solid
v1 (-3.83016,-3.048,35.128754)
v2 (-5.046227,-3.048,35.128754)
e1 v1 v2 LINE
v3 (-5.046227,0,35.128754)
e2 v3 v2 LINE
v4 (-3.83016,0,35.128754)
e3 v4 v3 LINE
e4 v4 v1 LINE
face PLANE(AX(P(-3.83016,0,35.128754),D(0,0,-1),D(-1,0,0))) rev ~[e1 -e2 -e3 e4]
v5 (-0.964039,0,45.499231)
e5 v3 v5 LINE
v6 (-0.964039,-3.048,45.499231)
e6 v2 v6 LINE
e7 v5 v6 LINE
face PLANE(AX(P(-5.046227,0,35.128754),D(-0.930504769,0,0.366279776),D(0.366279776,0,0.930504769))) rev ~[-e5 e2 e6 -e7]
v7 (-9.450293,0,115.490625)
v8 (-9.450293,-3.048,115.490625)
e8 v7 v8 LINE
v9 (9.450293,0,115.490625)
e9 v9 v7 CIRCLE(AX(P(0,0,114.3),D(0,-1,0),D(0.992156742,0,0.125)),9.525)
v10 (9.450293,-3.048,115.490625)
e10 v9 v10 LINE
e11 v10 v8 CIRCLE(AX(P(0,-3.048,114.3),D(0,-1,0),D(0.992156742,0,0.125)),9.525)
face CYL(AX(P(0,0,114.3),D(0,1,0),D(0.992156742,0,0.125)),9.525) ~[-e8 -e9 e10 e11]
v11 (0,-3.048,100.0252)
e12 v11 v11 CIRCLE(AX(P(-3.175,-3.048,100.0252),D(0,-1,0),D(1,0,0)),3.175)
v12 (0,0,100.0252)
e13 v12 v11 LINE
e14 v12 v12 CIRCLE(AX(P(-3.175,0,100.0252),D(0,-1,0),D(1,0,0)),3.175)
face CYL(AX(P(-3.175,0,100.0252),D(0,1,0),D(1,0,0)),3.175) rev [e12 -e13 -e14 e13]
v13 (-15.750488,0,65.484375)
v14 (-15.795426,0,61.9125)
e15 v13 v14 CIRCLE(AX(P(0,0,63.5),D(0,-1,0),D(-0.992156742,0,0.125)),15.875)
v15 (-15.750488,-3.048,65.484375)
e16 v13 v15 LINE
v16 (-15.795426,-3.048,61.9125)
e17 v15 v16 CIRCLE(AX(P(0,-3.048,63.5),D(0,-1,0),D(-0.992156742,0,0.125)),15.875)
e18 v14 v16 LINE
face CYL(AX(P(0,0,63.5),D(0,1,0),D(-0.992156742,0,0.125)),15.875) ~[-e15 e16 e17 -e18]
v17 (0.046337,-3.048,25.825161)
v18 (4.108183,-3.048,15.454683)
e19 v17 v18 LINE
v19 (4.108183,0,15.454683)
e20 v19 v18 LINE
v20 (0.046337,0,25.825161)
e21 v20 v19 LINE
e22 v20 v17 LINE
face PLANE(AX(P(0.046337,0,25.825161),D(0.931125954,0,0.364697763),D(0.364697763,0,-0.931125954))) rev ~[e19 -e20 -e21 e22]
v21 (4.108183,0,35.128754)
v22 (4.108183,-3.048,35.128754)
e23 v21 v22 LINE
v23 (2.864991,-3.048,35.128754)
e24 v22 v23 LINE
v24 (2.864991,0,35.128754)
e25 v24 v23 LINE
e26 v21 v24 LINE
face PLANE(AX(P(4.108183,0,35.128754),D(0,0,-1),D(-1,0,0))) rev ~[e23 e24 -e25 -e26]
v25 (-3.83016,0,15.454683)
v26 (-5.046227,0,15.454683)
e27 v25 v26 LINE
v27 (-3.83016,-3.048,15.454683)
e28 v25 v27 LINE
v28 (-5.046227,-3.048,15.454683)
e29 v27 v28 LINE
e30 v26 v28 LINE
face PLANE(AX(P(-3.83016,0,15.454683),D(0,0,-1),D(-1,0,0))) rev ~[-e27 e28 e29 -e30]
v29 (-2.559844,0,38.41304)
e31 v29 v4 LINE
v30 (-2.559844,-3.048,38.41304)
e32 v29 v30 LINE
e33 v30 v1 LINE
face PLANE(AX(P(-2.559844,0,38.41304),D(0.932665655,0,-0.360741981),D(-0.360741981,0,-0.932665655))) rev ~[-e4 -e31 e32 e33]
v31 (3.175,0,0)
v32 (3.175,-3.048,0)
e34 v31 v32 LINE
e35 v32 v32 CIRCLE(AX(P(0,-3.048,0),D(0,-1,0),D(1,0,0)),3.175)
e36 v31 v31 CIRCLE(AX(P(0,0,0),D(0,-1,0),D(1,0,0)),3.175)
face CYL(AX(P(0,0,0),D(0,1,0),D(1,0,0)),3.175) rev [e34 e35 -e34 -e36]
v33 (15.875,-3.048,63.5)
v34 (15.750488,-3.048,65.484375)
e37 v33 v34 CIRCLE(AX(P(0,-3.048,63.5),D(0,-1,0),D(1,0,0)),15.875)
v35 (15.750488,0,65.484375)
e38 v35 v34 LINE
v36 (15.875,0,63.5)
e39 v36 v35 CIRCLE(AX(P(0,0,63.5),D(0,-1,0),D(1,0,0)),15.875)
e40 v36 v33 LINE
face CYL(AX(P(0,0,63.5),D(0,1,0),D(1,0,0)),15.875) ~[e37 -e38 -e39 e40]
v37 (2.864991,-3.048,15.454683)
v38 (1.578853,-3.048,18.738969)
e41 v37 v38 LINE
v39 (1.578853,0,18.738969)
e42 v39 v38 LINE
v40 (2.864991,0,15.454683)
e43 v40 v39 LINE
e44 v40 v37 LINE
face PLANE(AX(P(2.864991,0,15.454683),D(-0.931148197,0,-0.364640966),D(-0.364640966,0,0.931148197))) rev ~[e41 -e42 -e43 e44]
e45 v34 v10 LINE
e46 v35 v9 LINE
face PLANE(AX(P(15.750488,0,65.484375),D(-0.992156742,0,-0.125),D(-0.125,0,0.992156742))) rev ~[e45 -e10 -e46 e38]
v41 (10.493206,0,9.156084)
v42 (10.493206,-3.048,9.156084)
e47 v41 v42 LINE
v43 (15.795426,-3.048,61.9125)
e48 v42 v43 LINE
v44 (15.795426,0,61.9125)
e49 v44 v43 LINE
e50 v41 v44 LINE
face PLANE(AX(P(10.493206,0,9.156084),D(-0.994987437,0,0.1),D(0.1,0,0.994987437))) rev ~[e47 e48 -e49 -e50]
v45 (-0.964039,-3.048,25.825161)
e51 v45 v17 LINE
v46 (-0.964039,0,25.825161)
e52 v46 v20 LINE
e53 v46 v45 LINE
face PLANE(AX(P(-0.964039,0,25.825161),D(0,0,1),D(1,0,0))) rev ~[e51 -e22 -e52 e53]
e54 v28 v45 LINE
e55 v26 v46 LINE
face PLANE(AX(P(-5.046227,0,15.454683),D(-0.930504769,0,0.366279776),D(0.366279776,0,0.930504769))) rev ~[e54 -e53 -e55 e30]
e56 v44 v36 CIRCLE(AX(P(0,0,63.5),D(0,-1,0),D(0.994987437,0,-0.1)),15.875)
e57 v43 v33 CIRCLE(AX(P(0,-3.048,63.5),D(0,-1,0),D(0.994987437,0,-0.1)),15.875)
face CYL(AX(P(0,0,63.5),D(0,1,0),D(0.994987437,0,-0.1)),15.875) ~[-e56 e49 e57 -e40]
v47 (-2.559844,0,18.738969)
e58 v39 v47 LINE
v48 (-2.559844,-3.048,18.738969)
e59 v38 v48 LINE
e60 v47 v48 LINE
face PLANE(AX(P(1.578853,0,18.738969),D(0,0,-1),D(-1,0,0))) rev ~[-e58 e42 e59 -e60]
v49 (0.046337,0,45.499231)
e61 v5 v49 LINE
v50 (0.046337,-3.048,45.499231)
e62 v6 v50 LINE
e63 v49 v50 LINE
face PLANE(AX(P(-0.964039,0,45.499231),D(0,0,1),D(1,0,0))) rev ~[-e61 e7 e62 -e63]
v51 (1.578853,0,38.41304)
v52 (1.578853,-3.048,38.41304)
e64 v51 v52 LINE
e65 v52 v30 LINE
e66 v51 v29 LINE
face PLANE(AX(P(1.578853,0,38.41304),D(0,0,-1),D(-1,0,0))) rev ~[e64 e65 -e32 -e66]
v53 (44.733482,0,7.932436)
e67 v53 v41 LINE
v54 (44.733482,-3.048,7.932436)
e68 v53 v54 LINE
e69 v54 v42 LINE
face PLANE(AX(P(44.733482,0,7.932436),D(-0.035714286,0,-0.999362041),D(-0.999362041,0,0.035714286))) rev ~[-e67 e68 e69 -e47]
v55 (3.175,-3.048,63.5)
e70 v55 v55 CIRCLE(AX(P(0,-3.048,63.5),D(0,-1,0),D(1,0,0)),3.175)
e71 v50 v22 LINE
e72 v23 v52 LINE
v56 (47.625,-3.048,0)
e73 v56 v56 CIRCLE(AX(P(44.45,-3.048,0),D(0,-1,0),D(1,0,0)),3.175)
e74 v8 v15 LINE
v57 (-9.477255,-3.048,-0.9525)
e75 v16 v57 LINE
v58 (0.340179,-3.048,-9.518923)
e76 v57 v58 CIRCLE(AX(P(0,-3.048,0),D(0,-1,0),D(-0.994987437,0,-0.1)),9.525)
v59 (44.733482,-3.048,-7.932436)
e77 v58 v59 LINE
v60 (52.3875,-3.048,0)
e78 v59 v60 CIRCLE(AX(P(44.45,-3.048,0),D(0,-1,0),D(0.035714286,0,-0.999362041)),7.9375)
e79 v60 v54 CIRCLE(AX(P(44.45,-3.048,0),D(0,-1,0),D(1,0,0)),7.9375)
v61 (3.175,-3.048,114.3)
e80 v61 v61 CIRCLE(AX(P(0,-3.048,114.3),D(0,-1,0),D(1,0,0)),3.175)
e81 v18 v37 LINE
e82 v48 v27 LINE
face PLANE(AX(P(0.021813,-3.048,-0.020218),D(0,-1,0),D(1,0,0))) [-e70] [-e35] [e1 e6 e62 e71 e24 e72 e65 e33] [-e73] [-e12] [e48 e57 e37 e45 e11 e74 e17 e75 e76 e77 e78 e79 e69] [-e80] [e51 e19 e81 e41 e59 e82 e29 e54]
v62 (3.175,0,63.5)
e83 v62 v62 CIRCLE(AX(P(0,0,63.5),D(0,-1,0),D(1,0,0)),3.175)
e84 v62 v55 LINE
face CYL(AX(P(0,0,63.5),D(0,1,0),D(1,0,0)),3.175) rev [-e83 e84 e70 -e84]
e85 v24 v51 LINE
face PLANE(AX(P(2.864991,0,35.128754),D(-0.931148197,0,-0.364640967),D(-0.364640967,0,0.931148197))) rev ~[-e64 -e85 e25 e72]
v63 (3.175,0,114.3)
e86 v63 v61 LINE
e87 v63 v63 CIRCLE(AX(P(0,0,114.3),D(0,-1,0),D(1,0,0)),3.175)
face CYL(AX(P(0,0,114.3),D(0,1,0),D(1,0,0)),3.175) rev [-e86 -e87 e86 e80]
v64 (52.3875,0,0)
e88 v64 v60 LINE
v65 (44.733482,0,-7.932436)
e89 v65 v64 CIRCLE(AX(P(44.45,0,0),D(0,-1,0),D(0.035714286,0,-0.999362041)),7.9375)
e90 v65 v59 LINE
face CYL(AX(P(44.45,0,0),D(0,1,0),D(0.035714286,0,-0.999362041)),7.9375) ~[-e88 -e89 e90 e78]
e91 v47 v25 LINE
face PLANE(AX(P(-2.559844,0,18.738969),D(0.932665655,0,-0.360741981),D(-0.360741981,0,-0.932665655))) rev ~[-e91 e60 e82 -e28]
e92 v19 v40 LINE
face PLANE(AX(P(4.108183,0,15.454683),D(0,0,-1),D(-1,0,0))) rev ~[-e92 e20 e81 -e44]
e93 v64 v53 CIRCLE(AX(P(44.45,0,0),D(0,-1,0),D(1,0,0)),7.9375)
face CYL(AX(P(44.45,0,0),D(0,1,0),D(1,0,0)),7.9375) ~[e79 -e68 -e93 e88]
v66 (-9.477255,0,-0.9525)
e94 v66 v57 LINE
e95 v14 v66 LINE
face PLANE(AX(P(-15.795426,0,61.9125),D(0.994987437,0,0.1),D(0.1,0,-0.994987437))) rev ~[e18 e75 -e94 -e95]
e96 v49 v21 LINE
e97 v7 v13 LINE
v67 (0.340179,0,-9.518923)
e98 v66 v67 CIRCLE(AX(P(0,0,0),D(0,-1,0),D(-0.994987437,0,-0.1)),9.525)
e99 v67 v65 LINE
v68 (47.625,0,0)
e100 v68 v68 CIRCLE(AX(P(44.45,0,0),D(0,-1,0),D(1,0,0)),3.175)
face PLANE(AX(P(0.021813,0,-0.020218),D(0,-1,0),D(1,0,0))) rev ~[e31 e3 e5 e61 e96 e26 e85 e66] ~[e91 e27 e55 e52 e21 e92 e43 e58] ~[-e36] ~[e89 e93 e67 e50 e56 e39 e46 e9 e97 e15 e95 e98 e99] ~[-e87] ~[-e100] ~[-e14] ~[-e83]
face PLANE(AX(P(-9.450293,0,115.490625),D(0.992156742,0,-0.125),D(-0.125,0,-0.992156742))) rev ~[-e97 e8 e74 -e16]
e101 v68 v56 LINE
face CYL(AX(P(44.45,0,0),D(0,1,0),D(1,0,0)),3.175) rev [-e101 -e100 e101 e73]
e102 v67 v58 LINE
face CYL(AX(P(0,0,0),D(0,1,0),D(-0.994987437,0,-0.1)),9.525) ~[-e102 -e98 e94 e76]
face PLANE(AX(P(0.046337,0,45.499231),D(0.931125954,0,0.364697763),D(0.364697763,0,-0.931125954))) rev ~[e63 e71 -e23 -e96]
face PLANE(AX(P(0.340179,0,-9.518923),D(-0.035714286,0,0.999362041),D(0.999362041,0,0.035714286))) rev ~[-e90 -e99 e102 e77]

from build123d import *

# Parameters (mm, degrees)
F0_R     = 3.175
F1_DEPTH = 3.048


with BuildPart() as f1:
    # F0 (on Front) → F1 (new body)
    with BuildSketch(Plane.XZ):
        with BuildLine():
            ThreePointArc((9.4772553384, -0.9525), (9.5130563464, -0.4768479324), (9.525, 0))
            ThreePointArc((9.525, 0), (6.8544082857, 6.6138273378), (0.3401785714, 9.5189234444))
            ThreePointArc((0.3401785714, 9.5189234444), (-6.948684782, 6.5147068085), (-9.4772553384, -0.9525))
            ThreePointArc((-9.4772553384, -0.9525), (-6.2623833552, -7.1769199322), (0.3401786416, -9.5189234418))
            ThreePointArc((0.3401786416, -9.5189234418), (6.5147068341, -6.948684758), (9.4772553384, -0.9525))
        make_face()
        Circle(F0_R, mode=Mode.SUBTRACT)
        with BuildLine():
            ThreePointArc((0.3401785714, 9.5189234444), (6.8544082857, 6.6138273378), (9.525, 0))
            ThreePointArc((9.525, 0), (9.5130563464, -0.4768479324), (9.4772553384, -0.9525))
            Line((9.4772553384, -0.9525), (10.4932062399, 9.1560838367))
            Line((10.4932062399, 9.1560838367), (0.3401785714, 9.5189234444))
        make_face()
        with BuildLine():
            ThreePointArc((-9.4772553384, -0.9525), (-6.948684782, 6.5147068085), (0.3401785714, 9.5189234444))
            Line((0.3401785714, 9.5189234444), (10.4932062399, 9.1560838367))
            Line((10.4932062399, 9.1560838367), (15.7954255641, 61.9125))
            ThreePointArc((15.7954255641, 61.9125), (0, 47.625), (-15.7954255641, 61.9125))
            Line((-15.7954255641, 61.9125), (-9.4772553384, -0.9525))
        make_face()
        Polygon((4.1081828244, 15.4546830389), (2.8649913232, 15.4546830389), (1.5788532065, 18.7389689503), (-2.5598443184, 18.7389689503), (-3.8301599978, 15.4546830389), (-5.0462273207, 15.4546830389), (-0.9640385005, 25.825160507), (0.0463371378, 25.825160507), align=None, mode=Mode.SUBTRACT)
        Polygon((4.1081828244, 35.1287536323), (2.8649913232, 35.1287536323), (1.5788532065, 38.4130395436), (-2.5598443184, 38.4130395436), (-3.8301599978, 35.1287536323), (-5.0462273207, 35.1287536323), (-0.9640385005, 45.4992311004), (0.0463371378, 45.4992311004), align=None, mode=Mode.SUBTRACT)
        with BuildLine():
            Line((10.4932062399, 9.1560838367), (9.4772553384, -0.9525))
            ThreePointArc((9.4772553384, -0.9525), (6.5147068341, -6.948684758), (0.3401786416, -9.5189234418))
            Line((0.3401786416, -9.5189234418), (44.7334821429, -7.9324362036))
            ThreePointArc((44.7334821429, -7.9324362036), (36.5125, 0), (44.7334821429, 7.9324362036))
            Line((44.7334821429, 7.9324362036), (10.4932062399, 9.1560838367))
        make_face()
        with BuildLine():
            ThreePointArc((-15.7504882737, 65.484375), (-15.8737438155, 63.6997054867), (-15.7954255641, 61.9125))
            ThreePointArc((-15.7954255641, 61.9125), (0, 47.625), (15.7954255641, 61.9125))
            ThreePointArc((15.7954255641, 61.9125), (15.8550939106, 62.7052534459), (15.875, 63.5))
            ThreePointArc((15.875, 63.5), (15.8438414904, 64.4941387366), (15.7504882737, 65.484375))
            ThreePointArc((15.7504882737, 65.484375), (0, 79.375), (-15.7504882737, 65.484375))
        make_face()
        with Locations((0, 63.5)):
            Circle(F0_R, mode=Mode.SUBTRACT)
        with BuildLine():
            ThreePointArc((52.3875, 0), (50.1620069047, 5.5115227815), (44.7334821429, 7.9324362036))
            ThreePointArc((44.7334821429, 7.9324362036), (36.5125, 0), (44.7334821429, -7.9324362036))
            ThreePointArc((44.7334821429, -7.9324362036), (50.1620069047, -5.5115227815), (52.3875, 0))
        make_face()
        with Locations((44.45, 0)):
            Circle(F0_R, mode=Mode.SUBTRACT)
        with BuildLine():
            Line((-9.4502929642, 115.490625), (-15.7504882737, 65.484375))
            ThreePointArc((-15.7504882737, 65.484375), (0, 79.375), (15.7504882737, 65.484375))
            Line((15.7504882737, 65.484375), (9.4502929642, 115.490625))
            ThreePointArc((9.4502929642, 115.490625), (9.5063048942, 114.896483242), (9.525, 114.3))
            ThreePointArc((9.525, 114.3), (-0.596483242, 104.7936951058), (-9.4502929642, 115.490625))
        make_face()
        with Locations((-3.175, 100.0252)):
            Circle(F0_R, mode=Mode.SUBTRACT)
        with BuildLine():
            ThreePointArc((9.4502929642, 115.490625), (0, 123.825), (-9.4502929642, 115.490625))
            ThreePointArc((-9.4502929642, 115.490625), (-0.596483242, 104.7936951058), (9.525, 114.3))
            ThreePointArc((9.525, 114.3), (9.5063048942, 114.896483242), (9.4502929642, 115.490625))
        make_face()
        with Locations((0, 114.3)):
            Circle(F0_R, mode=Mode.SUBTRACT)
    extrude(amount=F1_DEPTH)


solid = f1.part
